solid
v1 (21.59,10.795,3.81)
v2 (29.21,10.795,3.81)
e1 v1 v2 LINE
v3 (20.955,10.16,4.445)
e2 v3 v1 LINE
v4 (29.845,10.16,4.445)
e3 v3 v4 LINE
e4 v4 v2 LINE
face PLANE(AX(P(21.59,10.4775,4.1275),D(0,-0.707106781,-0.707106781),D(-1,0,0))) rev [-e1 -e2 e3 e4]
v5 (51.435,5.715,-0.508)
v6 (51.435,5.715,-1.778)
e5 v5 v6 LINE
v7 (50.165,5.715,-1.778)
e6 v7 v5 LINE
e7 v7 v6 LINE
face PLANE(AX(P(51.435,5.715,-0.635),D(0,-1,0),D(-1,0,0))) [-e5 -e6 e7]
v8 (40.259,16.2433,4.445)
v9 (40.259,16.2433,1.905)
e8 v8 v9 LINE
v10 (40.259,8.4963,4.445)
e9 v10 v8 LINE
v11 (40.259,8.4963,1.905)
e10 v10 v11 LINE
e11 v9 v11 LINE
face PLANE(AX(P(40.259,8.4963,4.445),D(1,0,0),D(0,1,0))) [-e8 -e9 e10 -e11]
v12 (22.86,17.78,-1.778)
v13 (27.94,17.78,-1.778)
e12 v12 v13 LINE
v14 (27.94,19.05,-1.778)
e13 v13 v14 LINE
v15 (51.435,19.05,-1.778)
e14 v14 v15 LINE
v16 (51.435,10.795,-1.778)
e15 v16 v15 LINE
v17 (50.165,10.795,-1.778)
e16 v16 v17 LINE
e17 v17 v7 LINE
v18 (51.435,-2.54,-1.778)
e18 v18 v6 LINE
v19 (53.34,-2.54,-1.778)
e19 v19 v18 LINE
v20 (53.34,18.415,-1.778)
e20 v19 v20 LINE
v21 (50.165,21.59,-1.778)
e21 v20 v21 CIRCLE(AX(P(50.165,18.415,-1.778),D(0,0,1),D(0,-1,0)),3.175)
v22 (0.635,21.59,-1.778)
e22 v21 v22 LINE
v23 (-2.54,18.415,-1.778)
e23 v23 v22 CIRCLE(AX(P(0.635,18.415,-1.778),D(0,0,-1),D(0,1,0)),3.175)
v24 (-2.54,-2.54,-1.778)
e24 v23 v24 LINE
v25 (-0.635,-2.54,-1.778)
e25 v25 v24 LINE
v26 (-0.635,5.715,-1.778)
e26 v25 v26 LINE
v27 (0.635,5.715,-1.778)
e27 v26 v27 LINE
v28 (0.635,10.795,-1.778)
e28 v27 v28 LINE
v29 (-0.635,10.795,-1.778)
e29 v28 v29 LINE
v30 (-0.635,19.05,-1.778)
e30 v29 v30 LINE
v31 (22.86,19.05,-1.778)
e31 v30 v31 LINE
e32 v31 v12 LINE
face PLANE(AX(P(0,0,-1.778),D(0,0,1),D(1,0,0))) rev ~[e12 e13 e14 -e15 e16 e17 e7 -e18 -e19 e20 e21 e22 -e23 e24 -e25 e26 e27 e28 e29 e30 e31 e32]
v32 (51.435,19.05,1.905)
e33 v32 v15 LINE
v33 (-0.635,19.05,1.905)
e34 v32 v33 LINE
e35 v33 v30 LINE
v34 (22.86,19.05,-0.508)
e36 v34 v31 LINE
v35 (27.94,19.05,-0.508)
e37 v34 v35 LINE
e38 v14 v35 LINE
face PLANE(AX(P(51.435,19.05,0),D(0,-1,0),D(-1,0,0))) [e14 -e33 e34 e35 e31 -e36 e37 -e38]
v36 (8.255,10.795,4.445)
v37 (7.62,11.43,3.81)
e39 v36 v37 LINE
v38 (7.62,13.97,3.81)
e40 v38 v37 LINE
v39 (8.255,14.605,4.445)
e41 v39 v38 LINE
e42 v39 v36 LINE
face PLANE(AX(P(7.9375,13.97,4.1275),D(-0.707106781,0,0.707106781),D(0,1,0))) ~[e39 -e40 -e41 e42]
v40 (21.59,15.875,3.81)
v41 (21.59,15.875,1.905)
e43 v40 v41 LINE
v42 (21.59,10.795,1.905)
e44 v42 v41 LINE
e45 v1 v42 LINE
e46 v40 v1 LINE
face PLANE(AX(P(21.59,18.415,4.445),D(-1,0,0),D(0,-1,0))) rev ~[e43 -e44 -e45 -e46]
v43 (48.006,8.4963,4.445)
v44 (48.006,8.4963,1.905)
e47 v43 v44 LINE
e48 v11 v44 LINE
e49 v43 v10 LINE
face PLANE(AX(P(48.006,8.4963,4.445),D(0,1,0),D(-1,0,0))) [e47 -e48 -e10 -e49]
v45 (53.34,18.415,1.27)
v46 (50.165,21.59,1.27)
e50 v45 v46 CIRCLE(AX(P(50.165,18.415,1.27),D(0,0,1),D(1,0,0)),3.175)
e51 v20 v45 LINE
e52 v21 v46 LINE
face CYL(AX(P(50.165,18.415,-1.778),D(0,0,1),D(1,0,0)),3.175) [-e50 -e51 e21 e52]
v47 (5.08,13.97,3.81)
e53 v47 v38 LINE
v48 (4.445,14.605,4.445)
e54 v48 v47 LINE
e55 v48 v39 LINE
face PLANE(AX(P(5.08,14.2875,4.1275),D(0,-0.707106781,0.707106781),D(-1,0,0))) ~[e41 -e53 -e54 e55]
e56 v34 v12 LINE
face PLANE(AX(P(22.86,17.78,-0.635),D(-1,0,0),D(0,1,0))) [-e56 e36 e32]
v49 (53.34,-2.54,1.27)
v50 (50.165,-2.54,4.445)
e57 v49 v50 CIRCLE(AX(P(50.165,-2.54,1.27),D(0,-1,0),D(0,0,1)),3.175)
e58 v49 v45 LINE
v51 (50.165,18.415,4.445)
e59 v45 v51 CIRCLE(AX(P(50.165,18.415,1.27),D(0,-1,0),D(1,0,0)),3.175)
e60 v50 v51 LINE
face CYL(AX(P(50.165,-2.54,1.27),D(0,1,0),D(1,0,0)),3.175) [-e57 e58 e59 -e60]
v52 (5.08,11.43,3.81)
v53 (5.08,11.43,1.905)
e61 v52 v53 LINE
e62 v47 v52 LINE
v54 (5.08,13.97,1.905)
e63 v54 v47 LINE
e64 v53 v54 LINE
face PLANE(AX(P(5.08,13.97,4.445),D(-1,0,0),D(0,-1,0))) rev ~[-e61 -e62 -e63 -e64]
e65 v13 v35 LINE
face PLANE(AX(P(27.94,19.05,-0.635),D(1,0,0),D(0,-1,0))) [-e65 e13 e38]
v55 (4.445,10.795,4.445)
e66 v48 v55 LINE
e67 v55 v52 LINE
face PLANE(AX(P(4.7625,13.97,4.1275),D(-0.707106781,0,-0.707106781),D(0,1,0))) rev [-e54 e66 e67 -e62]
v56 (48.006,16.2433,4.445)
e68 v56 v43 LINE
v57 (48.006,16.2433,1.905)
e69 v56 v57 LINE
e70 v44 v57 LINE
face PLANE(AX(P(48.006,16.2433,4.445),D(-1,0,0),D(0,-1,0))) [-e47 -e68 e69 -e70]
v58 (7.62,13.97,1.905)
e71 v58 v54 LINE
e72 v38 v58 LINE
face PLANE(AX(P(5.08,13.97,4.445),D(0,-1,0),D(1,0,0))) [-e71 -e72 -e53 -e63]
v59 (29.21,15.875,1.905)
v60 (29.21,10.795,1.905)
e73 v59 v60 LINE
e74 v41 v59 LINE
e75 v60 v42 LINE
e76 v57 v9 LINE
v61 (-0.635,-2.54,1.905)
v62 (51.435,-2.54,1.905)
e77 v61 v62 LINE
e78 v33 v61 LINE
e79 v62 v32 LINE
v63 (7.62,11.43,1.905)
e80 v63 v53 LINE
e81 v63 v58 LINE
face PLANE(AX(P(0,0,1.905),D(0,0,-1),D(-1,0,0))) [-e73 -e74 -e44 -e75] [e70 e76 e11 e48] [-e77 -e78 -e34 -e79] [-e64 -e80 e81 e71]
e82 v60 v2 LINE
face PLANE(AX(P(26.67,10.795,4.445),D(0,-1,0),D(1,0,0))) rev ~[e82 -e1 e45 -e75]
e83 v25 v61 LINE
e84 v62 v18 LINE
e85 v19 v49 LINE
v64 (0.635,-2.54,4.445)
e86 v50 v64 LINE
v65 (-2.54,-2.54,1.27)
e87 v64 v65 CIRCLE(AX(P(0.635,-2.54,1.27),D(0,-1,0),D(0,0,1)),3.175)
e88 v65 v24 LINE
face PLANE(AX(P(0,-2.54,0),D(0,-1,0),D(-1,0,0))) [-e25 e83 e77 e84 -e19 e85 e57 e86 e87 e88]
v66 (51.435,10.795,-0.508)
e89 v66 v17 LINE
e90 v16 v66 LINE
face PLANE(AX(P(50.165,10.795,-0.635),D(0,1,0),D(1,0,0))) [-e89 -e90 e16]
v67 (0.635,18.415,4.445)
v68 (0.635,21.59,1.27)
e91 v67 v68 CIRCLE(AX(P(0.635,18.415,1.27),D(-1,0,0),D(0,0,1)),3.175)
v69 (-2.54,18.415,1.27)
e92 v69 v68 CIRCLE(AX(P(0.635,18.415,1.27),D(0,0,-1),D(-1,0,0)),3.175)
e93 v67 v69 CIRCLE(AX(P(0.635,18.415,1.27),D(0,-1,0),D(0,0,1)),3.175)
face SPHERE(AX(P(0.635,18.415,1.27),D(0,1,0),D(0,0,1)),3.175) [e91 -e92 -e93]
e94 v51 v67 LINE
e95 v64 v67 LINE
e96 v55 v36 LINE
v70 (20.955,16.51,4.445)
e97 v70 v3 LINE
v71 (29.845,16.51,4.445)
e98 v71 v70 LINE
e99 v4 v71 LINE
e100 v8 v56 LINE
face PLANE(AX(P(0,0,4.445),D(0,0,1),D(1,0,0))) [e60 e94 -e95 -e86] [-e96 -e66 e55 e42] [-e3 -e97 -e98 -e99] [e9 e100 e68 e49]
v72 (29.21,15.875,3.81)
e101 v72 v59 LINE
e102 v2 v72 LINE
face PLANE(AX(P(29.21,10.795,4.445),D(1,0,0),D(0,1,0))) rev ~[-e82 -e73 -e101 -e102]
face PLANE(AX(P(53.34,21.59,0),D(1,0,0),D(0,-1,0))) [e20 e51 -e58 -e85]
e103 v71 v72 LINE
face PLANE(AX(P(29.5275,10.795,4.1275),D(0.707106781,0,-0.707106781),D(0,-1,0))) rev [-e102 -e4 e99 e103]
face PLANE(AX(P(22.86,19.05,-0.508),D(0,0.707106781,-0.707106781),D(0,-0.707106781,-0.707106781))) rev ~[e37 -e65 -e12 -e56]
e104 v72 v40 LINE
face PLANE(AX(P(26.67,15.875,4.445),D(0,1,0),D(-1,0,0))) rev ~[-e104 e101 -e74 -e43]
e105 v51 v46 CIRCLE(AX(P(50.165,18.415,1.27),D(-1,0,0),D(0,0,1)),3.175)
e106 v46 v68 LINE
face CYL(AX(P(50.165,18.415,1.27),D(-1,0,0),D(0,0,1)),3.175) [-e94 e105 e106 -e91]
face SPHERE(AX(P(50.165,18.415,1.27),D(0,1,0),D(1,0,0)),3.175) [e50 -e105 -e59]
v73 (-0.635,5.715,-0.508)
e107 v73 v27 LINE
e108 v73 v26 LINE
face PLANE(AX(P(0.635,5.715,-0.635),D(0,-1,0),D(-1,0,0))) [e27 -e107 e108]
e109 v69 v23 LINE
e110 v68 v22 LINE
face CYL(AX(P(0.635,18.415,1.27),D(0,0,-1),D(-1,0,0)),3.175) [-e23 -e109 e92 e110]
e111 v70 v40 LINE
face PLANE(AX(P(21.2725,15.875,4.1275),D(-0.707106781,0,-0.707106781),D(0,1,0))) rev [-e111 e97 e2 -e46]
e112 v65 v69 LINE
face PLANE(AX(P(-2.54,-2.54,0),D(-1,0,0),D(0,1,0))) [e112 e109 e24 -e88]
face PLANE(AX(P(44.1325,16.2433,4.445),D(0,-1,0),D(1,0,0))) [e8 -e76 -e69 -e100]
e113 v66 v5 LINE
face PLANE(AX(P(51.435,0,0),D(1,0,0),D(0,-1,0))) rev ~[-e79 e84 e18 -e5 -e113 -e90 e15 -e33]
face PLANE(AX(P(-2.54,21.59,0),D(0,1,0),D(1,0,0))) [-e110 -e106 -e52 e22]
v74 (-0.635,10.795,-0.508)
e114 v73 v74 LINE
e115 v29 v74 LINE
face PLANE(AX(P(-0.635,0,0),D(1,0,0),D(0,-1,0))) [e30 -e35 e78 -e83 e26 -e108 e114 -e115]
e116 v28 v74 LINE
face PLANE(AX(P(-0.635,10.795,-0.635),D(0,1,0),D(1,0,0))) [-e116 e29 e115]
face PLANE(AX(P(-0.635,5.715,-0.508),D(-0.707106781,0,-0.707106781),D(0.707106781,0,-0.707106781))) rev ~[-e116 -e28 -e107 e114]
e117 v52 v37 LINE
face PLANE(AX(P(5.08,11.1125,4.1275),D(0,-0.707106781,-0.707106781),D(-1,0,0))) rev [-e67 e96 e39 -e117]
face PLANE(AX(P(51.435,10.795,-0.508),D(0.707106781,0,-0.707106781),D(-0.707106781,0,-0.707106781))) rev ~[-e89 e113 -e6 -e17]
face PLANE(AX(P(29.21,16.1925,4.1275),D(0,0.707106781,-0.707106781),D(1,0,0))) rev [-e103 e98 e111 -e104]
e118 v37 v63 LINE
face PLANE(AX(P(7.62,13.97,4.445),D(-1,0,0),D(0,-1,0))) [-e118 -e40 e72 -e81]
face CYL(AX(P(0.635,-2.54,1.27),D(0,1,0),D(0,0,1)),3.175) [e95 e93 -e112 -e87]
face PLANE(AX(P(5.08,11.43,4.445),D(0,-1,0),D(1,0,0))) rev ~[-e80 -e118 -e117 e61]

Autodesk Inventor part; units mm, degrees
ref_plane "YZ Plane" through (0, 0, 0) normal (1, 0, 0) x (0, 1, 0)
ref_plane "XZ Plane" through (0, 0, 0) normal (0, 1, 0) x (-1, 0, 0)
ref_plane "XY Plane" through (0, 0, 0) normal (0, 0, 1) x (1, 0, 0)
sketch "Sketch1" plane through (0, 0, 0) normal (0, 0, 1) x (1, 0, 0)
  line L0 (0, 0) -> (50.8, 0)
  line L1 (50.8, 0) -> (50.8, 19.05)
  line L2 (50.8, 19.05) -> (0, 19.05)
  line L3 (0, 19.05) -> (0, 0)
  line L4 (0, 0) -> (0, -2.54)
  line L5 (0, -2.54) -> (-2.54, -2.54)
  line L6 (-2.54, -2.54) -> (-2.54, 19.05)
  line L7 (-2.54, 19.05) -> (-2.54, 21.59)
  line L8 (-2.54, 21.59) -> (53.34, 21.59)
  line L9 (53.34, 21.59) -> (53.34, -2.54)
  line L10 (53.34, -2.54) -> (0, -2.54)
  dimension "d0" = 50.8
  dimension "d1" = 19.05
  dimension "d2" = 50.8
  dimension "d3" = 2.54
  dimension "d4" = 2.54
  dimension "d5" = 2.54
  dimension "d6" = 55.88
extrude "Extrusion1" add sketch "Sketch1" along normal blind 1.905
sketch "Sketch2" plane through (0, 0, 1.905) normal (0, 0, 1) x (1, 0, 0)
  line L0 (-2.54, -2.54) -> (-2.54, 21.59)
  line L1 (-2.54, 21.59) -> (53.34, 21.59)
  line L2 (53.34, 21.59) -> (-2.54, 21.59) projected
  line L3 (53.34, 21.59) -> (53.34, -2.54)
  line L4 (53.34, -2.54) -> (-2.54, -2.54)
  line L5 (-2.54, -2.54) -> (53.34, -2.54) projected
  point P0 (0, 0)
extrude "Extrusion2" add sketch "Sketch2" along normal blind 2.54
sketch "Sketch3" plane through (0, 0, 0) normal (0, 0, -1) x (-1, 0, 0)
  line L0 (0, 0) -> (2.54, 0)
  line L1 (2.54, 21.59) -> (2.54, -2.54) projected
  line L2 (2.54, 0) -> (2.54, 19.05)
  line L3 (2.54, 0) -> (0.635, 0)
  line L4 (0.635, 0) -> (0.635, 19.05)
  line L5 (0.635, 19.05) -> (0, 19.05)
  line L6 (0, 19.05) -> (0, 0)
  line L7 (0, 0) -> (-50.8, 0) projected
  line L8 (0, 19.05) -> (0.635, 19.05)
  line L9 (-50.8, 0) -> (-51.435, 0)
  line L10 (-51.435, 0) -> (-51.435, 19.05)
  line L11 (-51.435, 19.05) -> (-50.8, 19.05)
  line L12 (-50.8, 19.05) -> (-50.8, 0)
  dimension "d11" = 1.905
  dimension "d12" = 0.635
  dimension "d13" = 19.05
extrude "Extrusion3" cut sketch "Sketch3" against normal blind 1.905
sketch "Sketch4" plane through (0, 0, 0) normal (0, 0, -1) x (-1, 0, 0)
  line L0 (2.54, -2.54) -> (-53.34, -2.54) projected
  line L1 (0, 0) -> (-51.435, 0)
  line L2 (-51.435, 0) -> (-51.435, 19.05) projected
  line L3 (-51.435, 0) -> (-51.435, -2.54)
  line L4 (-51.435, -2.54) -> (0, -2.54)
  line L5 (0.635, 0) -> (0.635, -2.54)
  line L6 (0.635, 0) -> (0, 0)
  line L7 (0.635, 0) -> (-51.435, 0) projected
  line L8 (0.635, -2.54) -> (0, -2.54)
extrude "Extrusion4" cut sketch "Sketch4" against normal blind 1.905
sketch "Sketch5" plane through (0, 0, 4.445) normal (0, 0, 1) x (1, 0, 0)
  line L0 (-2.54, 21.59) -> (7.62, 21.59)
  line L1 (53.34, 21.59) -> (-2.54, 21.59) projected
  line L2 (7.62, 21.59) -> (7.62, 11.43)
  line L3 (-2.54, 21.59) -> (5.08, 21.59)
  line L4 (5.08, 21.59) -> (5.08, 13.97)
  line L5 (5.08, 13.97) -> (7.62, 13.97)
  line L6 (5.08, 13.97) -> (5.08, 11.43)
  line L7 (5.08, 11.43) -> (7.62, 11.43)
  line L8 (-2.54, 21.59) -> (26.67, 21.59)
  line L9 (-2.54, 21.59) -> (19.05, 21.59)
  line L10 (19.05, 10.795) -> (26.67, 10.795)
  line L11 (26.67, 18.415) -> (19.05, 18.415)
  line L12 (26.67, 21.59) -> (29.21, 21.59)
  line L13 (19.05, 21.59) -> (21.59, 21.59)
  line L14 (21.59, 10.795) -> (29.21, 10.795)
  line L15 (29.21, 10.795) -> (29.21, 21.59)
  line L16 (26.67, 18.415) -> (29.21, 18.415)
  line L17 (21.59, 21.59) -> (21.59, 18.415)
  line L18 (29.21, 18.415) -> (21.59, 18.415)
  line L19 (21.59, 18.415) -> (21.59, 10.795)
  line L20 (53.34, 21.59) -> (40.64, 21.59)
  line L21 (40.64, 21.59) -> (40.64, 8.89)
  line L22 (53.34, 21.59) -> (47.625, 21.59)
  line L23 (47.625, 21.59) -> (47.625, 15.875)
  line L24 (47.625, 15.875) -> (40.64, 15.875)
  line L25 (47.625, 15.875) -> (47.625, 8.89)
  line L26 (47.625, 8.89) -> (40.64, 8.89)
  point P0 (0, 0)
  dimension "d18" = 10.16
  dimension "d19" = 10.16
  dimension "d20" = 7.62
  dimension "d21" = 7.62
  dimension "d22" = 29.21
  dimension "d23" = 21.59
  dimension "d24" = 10.795
  dimension "d25" = 3.175
  dimension "d26" = 2.54
  dimension "d27" = 2.54
  dimension "d28" = 12.7
  dimension "d29" = 12.7
  dimension "d30" = 5.715
extrude "Extrusion5" cut sketch "Sketch5" against normal blind 2.54 contours L5 L2 L7 L6 | L25 L26 L21 L24 | L15 L14 L10 L19 L11 L16
move faces "Move1" translate (0, -2.54, 0) faces at (26.67, 18.415, 3.5983)
move faces "Move2" translate (0, 0, -0.635) faces at (34.0783, 20.7433, 0)
sketch "Sketch6" plane through (53.34, 21.59, -0.635) normal (0, 0, -1) x (-1, 0, 0)
  line L0 (1.905, -2.54) -> (1.905, -13.335)
  line L1 (1.905, -24.13) -> (1.905, -2.54) projected
  line L2 (1.905, -13.335) -> (1.905, -10.795)
  line L3 (1.905, -13.335) -> (1.905, -15.875)
  line L4 (1.905, -15.875) -> (3.175, -15.875)
  line L5 (3.175, -15.875) -> (3.175, -10.795)
  line L6 (3.175, -10.795) -> (1.905, -10.795)
  line L7 (1.905, -2.54) -> (27.94, -2.54)
  line L8 (1.905, -2.54) -> (53.975, -2.54) projected
  line L9 (27.94, -2.54) -> (30.48, -2.54)
  line L10 (27.94, -2.54) -> (25.4, -2.54)
  line L11 (25.4, -2.54) -> (25.4, -3.81)
  line L12 (25.4, -3.81) -> (30.48, -3.81)
  line L13 (30.48, -3.81) -> (30.48, -2.54)
  line L14 (53.975, -2.54) -> (53.975, -13.335)
  line L15 (53.975, -2.54) -> (53.975, -24.13) projected
  line L16 (53.975, -13.335) -> (53.975, -10.795)
  line L17 (53.975, -10.795) -> (52.705, -10.795)
  line L18 (52.705, -10.795) -> (52.705, -15.875)
  line L19 (52.705, -15.875) -> (53.975, -15.875)
  line L20 (53.975, -15.875) -> (53.975, -10.795)
  point P0 (53.34, -21.59)
  dimension "d39" = 10.795
  dimension "d40" = 2.54
  dimension "d41" = 2.54
  dimension "d42" = 5.08
  dimension "d43" = 26.035
  dimension "d44" = 2.54
  dimension "d45" = 2.54
  dimension "d46" = 1.27
  dimension "d47" = 5.08
  dimension "d48" = 10.795
  dimension "d49" = 2.54
  dimension "d51" = 1.27
  dimension "d52" = 5.08
extrude "Extrusion6" add sketch "Sketch6" against normal blind 0.889
move faces "Move3" translate (0, 0, -0.381) faces at (26.2467, 20.7433, -0.635)
move faces "Move4" translate (0, 0, -0.762) faces at (24.5533, 20.7433, -1.016)
sketch "Sketch10" plane through (50.165, 10.795, 0.254) normal (0, 1, 0) x (1, 0, 0)
  line L0 (1.27, 2.032) -> (1.27, 0) projected
  line L1 (1.27, 2.032) -> (1.27, 0.762)
  line L2 (0, 2.032) -> (0, 0) projected
  line L3 (1.27, 0.762) -> (0, 2.032)
  line L4 (1.27, 0) -> (0, 0) projected
  line L5 (0, 2.032) -> (0, 0)
  line L6 (0, 0) -> (1.27, 0)
  line L7 (1.27, 0) -> (1.27, 0.762)
  point P0 (-50.165, 0.254)
  dimension "d70" = 1.27
extrude "Extrusion10" cut sketch "Sketch10" against normal blind 25.4
sketch "Sketch11" plane through (22.86, 17.78, 0.254) normal (-1, 0, 0) x (0, 0, 1)
  line L0 (-2.032, 1.27) -> (-0.762, 1.27)
  line L1 (-2.032, 1.27) -> (0, 1.27) projected
  line L2 (-2.032, 0) -> (-2.032, 1.27) projected
  line L3 (-0.762, 1.27) -> (-2.032, 0)
  line L4 (-2.032, 0) -> (0, 0) projected
  line L5 (-2.032, 0) -> (0, 0)
  line L6 (0, 0) -> (0, 1.27)
  line L7 (0, 1.27) -> (-0.762, 1.27)
  point P0 (-0.254, -17.78)
  dimension "d73" = 1.27
extrude "Extrusion11" cut sketch "Sketch11" against normal blind 6.35 contours L1 L6 L4 L3
sketch "Sketch12" plane through (-0.635, 5.715, 0.254) normal (0, -1, 0) x (1, 0, 0)
  line L0 (1.27, -2.032) -> (0, -2.032) projected
  line L1 (0, -2.032) -> (0, -0.762)
  line L2 (0, -2.032) -> (0, 0) projected
  line L3 (0, -0.762) -> (1.27, -2.032)
  line L4 (1.27, -2.032) -> (1.27, 0)
  line L5 (0, 0) -> (1.27, 0) projected
  line L6 (1.27, 0) -> (0, 0)
  line L7 (0, 0) -> (0, -0.762)
  point P0 (0.635, -0.254)
  dimension "d76" = 1.27
extrude "Extrusion12" cut sketch "Sketch12" against normal blind 6.35 contours L3 L2 L5 L4
sketch "Sketch13" plane through (0, 0, 4.445) normal (0, 0, 1) x (1, 0, 0)
  line L0 (53.34, -2.54) -> (53.34, 21.59) projected
  line L1 (53.34, 21.59) -> (44.1325, 21.59)
  line L2 (53.34, 21.59) -> (-2.54, 21.59) projected
  line L3 (44.1325, 21.59) -> (44.1325, 16.2433)
  line L4 (48.006, 12.3825) -> (48.006, 8.4963)
  line L5 (48.006, 8.4963) -> (40.259, 8.4963)
  line L6 (40.259, 8.4963) -> (40.259, 16.2433)
  line L7 (40.259, 16.2433) -> (48.006, 16.2433)
  line L8 (48.006, 16.2433) -> (48.006, 12.3825)
  point P0 (0, 0)
  dimension "d79" = 9.2075
  dimension "d82" = 3.8862
  dimension "d83" = 7.747
  dimension "d84" = 7.747
  dimension "d85" = 7.747
extrude "Extrusion13" cut sketch "Sketch13" against normal blind 6.35
fillet "Fillet1" radius 3.175 2 edges at (-2.54, 9.525, 4.445) (53.34, 9.525, 4.445)
fillet "Fillet2" radius 3.175 5 edges at (-1.6101, 21.59, 3.5151) (-2.54, 21.59, -0.254) (52.4101, 21.59, 3.5151) (53.34, 21.59, -0.254) (25.4, 21.59, 4.445)
chamfer "Chamfer1" distance 0.635 angle 45 8 edges at (25.4, 15.875, 4.445) (29.21, 13.335, 4.445) (25.4, 10.795, 4.445) (21.59, 13.335, 4.445) (6.35, 13.97, 4.445) (7.62, 12.7, 4.445) (6.35, 11.43, 4.445) (5.08, 12.7, 4.445)
properties part number "PIUIODaughterBoardCover"
